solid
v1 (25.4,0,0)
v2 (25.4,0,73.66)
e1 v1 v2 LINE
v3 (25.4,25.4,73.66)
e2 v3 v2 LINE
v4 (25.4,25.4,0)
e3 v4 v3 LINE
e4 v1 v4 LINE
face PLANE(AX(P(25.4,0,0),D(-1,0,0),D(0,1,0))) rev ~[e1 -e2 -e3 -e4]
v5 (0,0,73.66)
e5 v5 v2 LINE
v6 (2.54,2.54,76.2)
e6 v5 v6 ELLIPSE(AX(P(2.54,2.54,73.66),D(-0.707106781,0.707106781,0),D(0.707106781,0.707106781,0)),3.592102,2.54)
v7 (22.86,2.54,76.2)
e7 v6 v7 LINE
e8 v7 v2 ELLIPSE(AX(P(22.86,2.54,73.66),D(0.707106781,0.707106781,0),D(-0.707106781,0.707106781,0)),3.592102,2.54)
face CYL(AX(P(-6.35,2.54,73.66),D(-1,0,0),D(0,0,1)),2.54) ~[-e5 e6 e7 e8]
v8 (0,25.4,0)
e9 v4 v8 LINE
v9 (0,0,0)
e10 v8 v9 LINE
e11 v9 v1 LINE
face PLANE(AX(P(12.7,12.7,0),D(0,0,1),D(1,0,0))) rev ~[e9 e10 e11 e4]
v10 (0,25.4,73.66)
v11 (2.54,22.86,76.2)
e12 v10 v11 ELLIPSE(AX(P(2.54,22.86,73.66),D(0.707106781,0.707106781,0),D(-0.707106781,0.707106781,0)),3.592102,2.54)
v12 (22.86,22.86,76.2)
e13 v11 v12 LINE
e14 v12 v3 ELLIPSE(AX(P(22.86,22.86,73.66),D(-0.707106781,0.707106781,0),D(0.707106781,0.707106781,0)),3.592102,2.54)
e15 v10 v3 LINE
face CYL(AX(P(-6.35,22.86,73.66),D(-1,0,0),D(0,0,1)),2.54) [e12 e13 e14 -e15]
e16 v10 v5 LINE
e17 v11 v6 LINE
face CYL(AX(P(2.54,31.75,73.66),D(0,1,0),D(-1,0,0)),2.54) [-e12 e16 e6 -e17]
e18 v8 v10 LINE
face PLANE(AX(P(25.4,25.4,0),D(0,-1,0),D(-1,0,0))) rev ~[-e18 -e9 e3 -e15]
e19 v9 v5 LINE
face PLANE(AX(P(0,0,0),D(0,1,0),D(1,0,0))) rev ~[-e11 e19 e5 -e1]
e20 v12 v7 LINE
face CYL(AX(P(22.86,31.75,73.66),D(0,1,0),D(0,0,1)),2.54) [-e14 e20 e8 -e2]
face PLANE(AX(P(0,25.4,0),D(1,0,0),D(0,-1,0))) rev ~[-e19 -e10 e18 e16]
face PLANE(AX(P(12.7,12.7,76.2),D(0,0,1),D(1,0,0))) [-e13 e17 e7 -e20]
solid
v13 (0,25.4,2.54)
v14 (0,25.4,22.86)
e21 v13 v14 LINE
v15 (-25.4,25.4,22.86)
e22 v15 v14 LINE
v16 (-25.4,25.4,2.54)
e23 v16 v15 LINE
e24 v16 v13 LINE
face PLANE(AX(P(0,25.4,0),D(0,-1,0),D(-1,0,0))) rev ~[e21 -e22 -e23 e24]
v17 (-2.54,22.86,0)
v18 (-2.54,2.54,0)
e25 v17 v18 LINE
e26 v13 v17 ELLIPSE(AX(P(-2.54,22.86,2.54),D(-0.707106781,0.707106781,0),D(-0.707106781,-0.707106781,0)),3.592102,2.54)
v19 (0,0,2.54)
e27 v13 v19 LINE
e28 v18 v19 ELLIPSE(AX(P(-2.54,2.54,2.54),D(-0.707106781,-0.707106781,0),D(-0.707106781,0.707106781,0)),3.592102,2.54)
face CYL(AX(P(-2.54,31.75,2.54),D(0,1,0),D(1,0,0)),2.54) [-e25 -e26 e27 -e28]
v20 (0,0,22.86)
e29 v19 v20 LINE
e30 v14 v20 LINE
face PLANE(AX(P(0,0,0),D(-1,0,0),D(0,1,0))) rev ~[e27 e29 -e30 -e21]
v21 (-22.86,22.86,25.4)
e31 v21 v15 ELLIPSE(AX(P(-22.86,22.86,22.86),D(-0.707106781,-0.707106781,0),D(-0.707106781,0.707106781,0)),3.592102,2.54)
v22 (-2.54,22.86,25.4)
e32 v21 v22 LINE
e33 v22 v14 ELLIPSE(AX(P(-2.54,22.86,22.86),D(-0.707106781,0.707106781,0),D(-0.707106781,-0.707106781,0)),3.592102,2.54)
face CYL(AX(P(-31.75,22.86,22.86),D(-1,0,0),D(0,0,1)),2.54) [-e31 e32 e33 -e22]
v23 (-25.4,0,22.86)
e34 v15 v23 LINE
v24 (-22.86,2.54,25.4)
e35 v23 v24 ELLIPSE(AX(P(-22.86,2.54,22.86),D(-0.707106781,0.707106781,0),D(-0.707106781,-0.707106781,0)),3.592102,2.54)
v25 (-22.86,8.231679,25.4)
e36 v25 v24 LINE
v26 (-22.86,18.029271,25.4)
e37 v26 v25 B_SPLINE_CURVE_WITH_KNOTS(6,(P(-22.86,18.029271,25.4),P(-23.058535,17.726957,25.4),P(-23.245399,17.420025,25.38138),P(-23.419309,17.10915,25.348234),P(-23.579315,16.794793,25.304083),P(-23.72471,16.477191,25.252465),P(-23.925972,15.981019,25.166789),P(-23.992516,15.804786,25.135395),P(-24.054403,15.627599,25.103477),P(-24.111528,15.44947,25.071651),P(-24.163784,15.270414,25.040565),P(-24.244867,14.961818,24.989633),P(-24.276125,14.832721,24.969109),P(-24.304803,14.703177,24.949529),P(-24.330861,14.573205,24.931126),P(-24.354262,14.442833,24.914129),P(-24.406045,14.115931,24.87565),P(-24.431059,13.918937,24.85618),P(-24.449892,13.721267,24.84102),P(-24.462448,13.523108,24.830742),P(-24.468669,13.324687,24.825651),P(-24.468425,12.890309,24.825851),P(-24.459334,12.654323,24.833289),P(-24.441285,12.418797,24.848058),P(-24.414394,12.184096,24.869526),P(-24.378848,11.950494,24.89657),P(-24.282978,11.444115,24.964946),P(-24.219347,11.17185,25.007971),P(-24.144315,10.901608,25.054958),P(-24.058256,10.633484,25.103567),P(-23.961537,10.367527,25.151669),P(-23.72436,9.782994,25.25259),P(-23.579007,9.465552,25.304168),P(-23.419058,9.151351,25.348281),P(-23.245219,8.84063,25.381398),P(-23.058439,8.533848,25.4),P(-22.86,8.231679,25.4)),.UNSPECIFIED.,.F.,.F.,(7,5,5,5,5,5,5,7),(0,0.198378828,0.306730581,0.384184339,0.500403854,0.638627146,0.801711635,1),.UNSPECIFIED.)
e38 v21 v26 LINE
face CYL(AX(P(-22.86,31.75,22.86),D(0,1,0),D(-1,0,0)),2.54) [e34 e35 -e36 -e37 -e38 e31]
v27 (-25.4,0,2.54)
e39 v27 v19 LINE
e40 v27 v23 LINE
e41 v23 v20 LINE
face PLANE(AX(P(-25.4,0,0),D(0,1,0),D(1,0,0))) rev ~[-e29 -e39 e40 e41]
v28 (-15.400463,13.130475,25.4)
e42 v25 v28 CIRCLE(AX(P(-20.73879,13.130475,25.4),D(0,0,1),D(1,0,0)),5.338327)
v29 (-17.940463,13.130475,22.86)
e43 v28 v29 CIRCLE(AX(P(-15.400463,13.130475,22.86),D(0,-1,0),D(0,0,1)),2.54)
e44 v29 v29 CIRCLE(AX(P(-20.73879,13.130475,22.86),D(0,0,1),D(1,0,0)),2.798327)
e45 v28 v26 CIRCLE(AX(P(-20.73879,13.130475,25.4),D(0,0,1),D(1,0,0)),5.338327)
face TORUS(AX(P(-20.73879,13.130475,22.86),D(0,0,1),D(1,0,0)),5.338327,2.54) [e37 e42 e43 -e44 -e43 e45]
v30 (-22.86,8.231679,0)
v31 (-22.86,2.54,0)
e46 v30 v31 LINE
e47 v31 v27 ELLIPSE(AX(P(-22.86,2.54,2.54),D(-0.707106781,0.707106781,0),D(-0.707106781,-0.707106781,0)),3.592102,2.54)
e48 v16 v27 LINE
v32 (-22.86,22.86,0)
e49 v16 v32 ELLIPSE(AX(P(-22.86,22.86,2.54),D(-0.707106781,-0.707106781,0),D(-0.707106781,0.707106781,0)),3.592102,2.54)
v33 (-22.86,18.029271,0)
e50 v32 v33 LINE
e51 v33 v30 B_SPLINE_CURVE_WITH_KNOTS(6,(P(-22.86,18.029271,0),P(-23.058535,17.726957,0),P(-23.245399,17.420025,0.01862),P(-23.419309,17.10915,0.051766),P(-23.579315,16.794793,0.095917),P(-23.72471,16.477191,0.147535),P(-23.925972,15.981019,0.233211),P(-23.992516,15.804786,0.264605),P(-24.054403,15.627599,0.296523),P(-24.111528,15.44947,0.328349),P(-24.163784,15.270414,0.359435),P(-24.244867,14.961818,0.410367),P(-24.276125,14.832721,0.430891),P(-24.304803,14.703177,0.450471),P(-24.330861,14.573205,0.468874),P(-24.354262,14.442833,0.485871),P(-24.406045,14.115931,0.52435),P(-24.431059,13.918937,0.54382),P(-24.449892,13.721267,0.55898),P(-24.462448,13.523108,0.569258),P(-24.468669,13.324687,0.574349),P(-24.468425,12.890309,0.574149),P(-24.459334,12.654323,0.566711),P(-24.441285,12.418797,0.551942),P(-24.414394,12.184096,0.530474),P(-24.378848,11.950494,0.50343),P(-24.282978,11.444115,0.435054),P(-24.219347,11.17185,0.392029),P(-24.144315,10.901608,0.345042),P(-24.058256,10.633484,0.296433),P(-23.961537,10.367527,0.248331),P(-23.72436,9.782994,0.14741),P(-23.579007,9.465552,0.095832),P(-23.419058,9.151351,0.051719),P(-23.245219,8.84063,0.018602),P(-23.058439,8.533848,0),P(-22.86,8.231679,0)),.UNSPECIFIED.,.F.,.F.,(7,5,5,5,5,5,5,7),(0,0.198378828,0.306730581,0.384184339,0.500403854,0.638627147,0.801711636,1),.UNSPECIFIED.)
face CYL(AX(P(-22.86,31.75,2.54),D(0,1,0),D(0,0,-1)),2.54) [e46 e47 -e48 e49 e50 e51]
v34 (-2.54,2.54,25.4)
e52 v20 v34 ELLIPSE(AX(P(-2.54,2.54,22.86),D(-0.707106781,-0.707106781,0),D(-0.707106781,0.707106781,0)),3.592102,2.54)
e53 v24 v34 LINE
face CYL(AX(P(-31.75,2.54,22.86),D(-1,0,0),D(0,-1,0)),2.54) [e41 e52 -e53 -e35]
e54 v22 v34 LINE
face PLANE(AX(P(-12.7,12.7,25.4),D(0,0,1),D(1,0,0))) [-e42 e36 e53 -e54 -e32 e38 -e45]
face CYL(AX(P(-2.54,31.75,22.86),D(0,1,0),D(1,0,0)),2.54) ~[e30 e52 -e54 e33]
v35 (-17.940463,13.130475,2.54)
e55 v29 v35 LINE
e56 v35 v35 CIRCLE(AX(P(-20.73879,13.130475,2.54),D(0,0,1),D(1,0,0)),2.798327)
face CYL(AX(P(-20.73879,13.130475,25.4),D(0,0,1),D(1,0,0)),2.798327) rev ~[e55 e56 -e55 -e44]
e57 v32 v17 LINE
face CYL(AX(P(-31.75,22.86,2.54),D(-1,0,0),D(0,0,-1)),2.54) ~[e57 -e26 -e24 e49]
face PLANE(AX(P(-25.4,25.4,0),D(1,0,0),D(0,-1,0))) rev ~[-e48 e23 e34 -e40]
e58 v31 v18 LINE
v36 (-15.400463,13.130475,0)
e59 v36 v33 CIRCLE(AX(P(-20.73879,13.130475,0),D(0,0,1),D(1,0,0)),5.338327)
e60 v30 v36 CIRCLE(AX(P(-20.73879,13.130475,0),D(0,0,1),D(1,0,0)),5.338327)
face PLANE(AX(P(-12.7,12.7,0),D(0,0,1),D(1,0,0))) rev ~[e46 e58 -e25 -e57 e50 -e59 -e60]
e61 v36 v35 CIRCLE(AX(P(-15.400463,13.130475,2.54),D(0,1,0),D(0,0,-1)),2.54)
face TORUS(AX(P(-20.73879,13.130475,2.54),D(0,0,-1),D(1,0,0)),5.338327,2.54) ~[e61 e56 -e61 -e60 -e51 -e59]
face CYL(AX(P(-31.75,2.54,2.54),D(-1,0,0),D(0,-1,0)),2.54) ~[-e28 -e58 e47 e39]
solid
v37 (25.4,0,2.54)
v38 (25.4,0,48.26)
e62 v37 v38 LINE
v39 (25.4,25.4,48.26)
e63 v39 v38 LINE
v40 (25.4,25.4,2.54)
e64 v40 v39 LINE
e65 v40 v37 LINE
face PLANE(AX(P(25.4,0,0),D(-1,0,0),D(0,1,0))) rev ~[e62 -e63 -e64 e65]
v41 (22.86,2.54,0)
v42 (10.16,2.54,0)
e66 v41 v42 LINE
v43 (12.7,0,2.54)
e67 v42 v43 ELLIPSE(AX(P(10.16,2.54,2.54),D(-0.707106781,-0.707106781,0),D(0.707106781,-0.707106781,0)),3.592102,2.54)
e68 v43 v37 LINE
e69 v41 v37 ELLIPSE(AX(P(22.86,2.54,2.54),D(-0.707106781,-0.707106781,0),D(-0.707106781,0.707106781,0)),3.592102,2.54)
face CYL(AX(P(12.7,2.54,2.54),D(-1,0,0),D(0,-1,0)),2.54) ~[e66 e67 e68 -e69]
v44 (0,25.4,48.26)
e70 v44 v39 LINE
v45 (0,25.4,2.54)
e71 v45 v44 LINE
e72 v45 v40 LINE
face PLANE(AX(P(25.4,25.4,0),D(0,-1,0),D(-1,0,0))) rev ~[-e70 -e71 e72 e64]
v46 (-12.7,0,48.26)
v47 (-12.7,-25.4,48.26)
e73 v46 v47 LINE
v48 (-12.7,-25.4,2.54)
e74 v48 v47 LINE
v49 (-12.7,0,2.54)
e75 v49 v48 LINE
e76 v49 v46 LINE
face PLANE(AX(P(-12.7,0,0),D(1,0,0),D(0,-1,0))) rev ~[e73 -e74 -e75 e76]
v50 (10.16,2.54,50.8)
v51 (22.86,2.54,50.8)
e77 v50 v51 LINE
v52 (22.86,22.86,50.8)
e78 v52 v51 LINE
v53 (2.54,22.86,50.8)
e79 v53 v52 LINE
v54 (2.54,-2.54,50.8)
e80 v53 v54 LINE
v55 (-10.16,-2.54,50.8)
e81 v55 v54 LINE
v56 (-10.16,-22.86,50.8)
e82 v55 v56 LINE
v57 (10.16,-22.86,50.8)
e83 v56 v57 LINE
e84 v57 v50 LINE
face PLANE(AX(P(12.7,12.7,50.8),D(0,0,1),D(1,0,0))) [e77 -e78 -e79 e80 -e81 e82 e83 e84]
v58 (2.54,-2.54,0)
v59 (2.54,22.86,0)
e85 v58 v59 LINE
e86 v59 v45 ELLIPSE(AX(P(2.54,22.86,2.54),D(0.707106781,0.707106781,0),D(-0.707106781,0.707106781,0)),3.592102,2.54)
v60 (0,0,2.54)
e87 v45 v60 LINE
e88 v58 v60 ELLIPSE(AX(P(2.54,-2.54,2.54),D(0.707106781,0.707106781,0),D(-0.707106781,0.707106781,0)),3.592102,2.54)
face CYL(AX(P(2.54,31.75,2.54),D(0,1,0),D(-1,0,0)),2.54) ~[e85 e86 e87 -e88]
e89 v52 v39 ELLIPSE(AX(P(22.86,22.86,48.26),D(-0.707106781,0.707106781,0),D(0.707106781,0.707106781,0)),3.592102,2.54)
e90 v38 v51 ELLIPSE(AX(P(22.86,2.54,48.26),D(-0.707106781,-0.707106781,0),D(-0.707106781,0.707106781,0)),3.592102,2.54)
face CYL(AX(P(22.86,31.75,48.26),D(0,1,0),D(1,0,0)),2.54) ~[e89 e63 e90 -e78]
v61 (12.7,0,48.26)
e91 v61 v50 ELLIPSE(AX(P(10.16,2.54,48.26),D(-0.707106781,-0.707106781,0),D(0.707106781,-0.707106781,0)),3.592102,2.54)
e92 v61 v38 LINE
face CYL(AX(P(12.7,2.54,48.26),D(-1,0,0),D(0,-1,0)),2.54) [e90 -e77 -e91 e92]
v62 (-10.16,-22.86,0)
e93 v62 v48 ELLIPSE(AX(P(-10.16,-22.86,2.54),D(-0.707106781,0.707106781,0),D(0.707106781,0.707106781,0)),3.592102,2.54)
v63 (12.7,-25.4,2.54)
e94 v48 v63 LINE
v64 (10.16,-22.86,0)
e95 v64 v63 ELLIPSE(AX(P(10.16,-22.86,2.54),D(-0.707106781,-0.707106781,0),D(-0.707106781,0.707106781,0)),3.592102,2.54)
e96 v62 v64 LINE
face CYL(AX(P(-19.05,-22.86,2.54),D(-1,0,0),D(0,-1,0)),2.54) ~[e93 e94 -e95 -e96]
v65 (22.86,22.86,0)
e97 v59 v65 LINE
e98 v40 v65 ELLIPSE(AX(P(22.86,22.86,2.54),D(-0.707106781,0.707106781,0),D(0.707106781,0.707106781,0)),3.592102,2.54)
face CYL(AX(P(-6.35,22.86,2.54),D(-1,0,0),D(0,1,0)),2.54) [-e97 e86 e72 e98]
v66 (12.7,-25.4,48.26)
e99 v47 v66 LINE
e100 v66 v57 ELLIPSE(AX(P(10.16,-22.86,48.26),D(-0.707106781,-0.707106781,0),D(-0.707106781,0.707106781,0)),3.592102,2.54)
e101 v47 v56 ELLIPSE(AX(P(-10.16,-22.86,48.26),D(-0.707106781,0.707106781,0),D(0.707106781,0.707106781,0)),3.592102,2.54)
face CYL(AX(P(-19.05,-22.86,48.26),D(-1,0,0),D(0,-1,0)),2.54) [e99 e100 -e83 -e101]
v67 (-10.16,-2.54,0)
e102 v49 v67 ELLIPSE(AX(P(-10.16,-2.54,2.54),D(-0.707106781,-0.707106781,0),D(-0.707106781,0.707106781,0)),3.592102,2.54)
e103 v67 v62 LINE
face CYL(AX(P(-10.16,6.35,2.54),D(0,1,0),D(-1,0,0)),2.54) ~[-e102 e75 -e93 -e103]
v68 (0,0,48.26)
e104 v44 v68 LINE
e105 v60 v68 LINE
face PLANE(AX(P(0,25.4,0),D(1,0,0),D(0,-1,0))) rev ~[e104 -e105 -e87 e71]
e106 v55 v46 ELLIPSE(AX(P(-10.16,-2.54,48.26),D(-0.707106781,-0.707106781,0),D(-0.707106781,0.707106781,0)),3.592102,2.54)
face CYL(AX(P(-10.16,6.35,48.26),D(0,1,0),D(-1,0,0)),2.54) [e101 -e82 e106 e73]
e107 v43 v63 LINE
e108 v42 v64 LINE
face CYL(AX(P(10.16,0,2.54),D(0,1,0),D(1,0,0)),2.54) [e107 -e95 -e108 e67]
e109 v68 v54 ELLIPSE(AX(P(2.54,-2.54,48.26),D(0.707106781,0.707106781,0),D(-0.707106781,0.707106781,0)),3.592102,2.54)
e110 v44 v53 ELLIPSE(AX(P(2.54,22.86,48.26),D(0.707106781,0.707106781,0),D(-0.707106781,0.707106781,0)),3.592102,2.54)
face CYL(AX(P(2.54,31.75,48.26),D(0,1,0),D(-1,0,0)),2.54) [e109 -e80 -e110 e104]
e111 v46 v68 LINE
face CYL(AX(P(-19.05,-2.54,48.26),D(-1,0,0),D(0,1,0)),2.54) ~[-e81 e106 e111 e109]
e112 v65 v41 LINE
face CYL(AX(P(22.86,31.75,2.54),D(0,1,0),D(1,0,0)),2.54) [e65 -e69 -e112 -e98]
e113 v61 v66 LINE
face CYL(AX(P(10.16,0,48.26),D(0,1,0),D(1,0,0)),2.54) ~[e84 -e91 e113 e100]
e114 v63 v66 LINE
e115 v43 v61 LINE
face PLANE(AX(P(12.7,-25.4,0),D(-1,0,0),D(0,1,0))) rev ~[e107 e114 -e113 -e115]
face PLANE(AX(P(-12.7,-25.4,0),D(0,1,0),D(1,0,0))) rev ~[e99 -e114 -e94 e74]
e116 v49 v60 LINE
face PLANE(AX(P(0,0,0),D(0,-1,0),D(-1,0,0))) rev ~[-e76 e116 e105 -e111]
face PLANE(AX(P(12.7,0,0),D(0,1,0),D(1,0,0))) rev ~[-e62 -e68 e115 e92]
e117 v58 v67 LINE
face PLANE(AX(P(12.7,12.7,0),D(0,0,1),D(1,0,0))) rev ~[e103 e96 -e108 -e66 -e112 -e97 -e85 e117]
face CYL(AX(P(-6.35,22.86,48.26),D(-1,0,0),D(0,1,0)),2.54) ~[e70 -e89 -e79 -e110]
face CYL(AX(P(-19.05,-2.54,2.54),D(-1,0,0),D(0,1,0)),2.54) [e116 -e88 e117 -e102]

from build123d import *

# Parameters (mm, degrees)
F1_DEPTH       = 25.4
F3_DEPTH       = 76.2
F4_DEPTH       = 50.8
F5_R           = 2.7983271334
F6_DEPTH       = 40.64
F7_T1_DEPTH    = 38.1
F7_T3_DEPTH    = 38.1
F7_2_T1_DEPTH  = 31.75
F7_2_T3_DEPTH  = 19.05
F7_2_T5_DEPTH  = 38.1
F7_2_T7_DEPTH  = 38.1
F7_2_T9_DEPTH  = 31.75
F7_2_T11_DEPTH = 19.05
F7_2_T13_DEPTH = 38.1
F7_2_T15_DEPTH = 38.1
F7_2_T21_DEPTH = 38.1
F7_2_T25_DEPTH = 25.4
F7_2_T32_DEPTH = 38.1
F7_2_T36_DEPTH = 25.4
F7_2_T43_DEPTH = 38.1
F7_2_T47_DEPTH = 25.4
F7_2_T54_DEPTH = 38.1
F7_2_T58_DEPTH = 25.4
F7_3_T1_DEPTH  = 38.1
F7_3_T3_DEPTH  = 38.1


# Not quite as in the source:
# - a fillet or chamfer that OpenCascade refuses, or shapes differently, is made with other operations: its cross-section is extruded or revolved along the edge and cut away or added


with BuildPart() as f1:
    # F0 (on Top) → F1 (new body)
    with BuildSketch(Plane.XY):
        Polygon((-12.7, 0), (0, 0), (0, 25.4), (-25.4, 25.4), (-25.4, 0), align=None)
    extrude(amount=F1_DEPTH)

    # F5 (on face) → F6 (cut)
    with BuildSketch(Plane.XY.offset(25.4)):
        with Locations((-20.7387898117, 13.1304748356)):
            Circle(F5_R)
    extrude(amount=-F6_DEPTH, mode=Mode.SUBTRACT)

    # F7: fillet of radius 2.54 on 10 edges, made by hand

    # F7_s2 → F7_t1 (cut)
    with BuildSketch(Plane.YZ.offset(-31.75)):
        with BuildLine():
            ThreePointArc((0, 22.86), (0.7439487758, 24.6560512242), (2.54, 25.4))
            Line((2.54, 25.4), (0, 25.4))
            Line((0, 25.4), (0, 22.86))
        make_face()
        with BuildLine():
            ThreePointArc((22.86, 25.4), (24.6560512242, 24.6560512242), (25.4, 22.86))
            Line((25.4, 22.86), (25.4, 25.4))
            Line((25.4, 25.4), (22.86, 25.4))
        make_face()
        with BuildLine():
            ThreePointArc((0, 2.54), (0.7439487758, 0.7439487758), (2.54, 0))
            Line((2.54, 0), (0, 0))
            Line((0, 0), (0, 2.54))
        make_face()
        with BuildLine():
            ThreePointArc((22.86, 0), (24.6560512242, 0.7439487758), (25.4, 2.54))
            Line((25.4, 2.54), (25.4, 0))
            Line((25.4, 0), (22.86, 0))
        make_face()
    extrude(amount=F7_T1_DEPTH, mode=Mode.SUBTRACT)

    # F7_s4 → F7_t3 (cut)
    with BuildSketch(Plane.XZ.offset(-31.75)):
        with BuildLine():
            ThreePointArc((0, 22.86), (-0.7439487758, 24.6560512242), (-2.54, 25.4))
            Line((-2.54, 25.4), (0, 25.4))
            Line((0, 25.4), (0, 22.86))
        make_face()
        with BuildLine():
            ThreePointArc((-25.4, 22.86), (-24.6560512242, 24.6560512242), (-22.86, 25.4))
            Line((-22.86, 25.4), (-25.4, 25.4))
            Line((-25.4, 25.4), (-25.4, 22.86))
        make_face()
        with BuildLine():
            ThreePointArc((0, 2.54), (-0.7439487758, 0.7439487758), (-2.54, 0))
            Line((-2.54, 0), (0, 0))
            Line((0, 0), (0, 2.54))
        make_face()
        with BuildLine():
            ThreePointArc((-22.86, 0), (-24.6560512242, 0.7439487758), (-25.4, 2.54))
            Line((-25.4, 2.54), (-25.4, 0))
            Line((-25.4, 0), (-22.86, 0))
        make_face()
    extrude(amount=F7_T3_DEPTH, mode=Mode.SUBTRACT)

    # F7_s5 → F7_t6 (revolve, cut)
    with BuildSketch(Plane.XZ.offset(-13.1304748356)):
        with BuildLine():
            ThreePointArc((-15.4004626784, 25.4), (-17.1965139026, 24.6560512242), (-17.9404626784, 22.86))
            Line((-17.9404626784, 22.86), (-17.9404626784, 25.4))
            Line((-17.9404626784, 25.4), (-15.4004626784, 25.4))
        make_face()
    revolve(axis=Axis((-20.7387898117, 13.1304748356, 25.4), (0, 0, 1)), mode=Mode.SUBTRACT)

    # F7_s7 → F7_t8 (revolve, cut)
    with BuildSketch(Plane.XZ.offset(-13.1304748356)):
        with BuildLine():
            ThreePointArc((-15.4004626784, 0), (-17.1965139026, 0.7439487758), (-17.9404626784, 2.54))
            Line((-17.9404626784, 2.54), (-17.9404626784, 0))
            Line((-17.9404626784, 0), (-15.4004626784, 0))
        make_face()
    revolve(axis=Axis((-20.7387898117, 13.1304748356, 0), (0, 0, 1)), mode=Mode.SUBTRACT)


with BuildPart() as f3:
    # F2 (on Top) → F3 (new body)
    with BuildSketch(Plane.XY):
        Polygon((0, 25.4), (0, 0), (12.7, 0), (25.4, 0), (25.4, 25.4), align=None)
    extrude(amount=F3_DEPTH)

    # F7#3: fillet of radius 2.54 on 4 edges, made by hand

    # F7_3_s2 → F7_3_t1 (cut)
    with BuildSketch(Plane.XZ.offset(-31.75)):
        with BuildLine():
            ThreePointArc((0, 73.66), (0.7439487758, 75.4560512242), (2.54, 76.2))
            Line((2.54, 76.2), (0, 76.2))
            Line((0, 76.2), (0, 73.66))
        make_face()
        with BuildLine():
            ThreePointArc((22.86, 76.2), (24.6560512242, 75.4560512242), (25.4, 73.66))
            Line((25.4, 73.66), (25.4, 76.2))
            Line((25.4, 76.2), (22.86, 76.2))
        make_face()
    extrude(amount=F7_3_T1_DEPTH, mode=Mode.SUBTRACT)

    # F7_3_s4 → F7_3_t3 (cut)
    with BuildSketch(Plane.YZ.offset(-6.35)):
        with BuildLine():
            ThreePointArc((2.54, 76.2), (0.7439487758, 75.4560512242), (0, 73.66))
            Line((0, 73.66), (0, 76.2))
            Line((0, 76.2), (2.54, 76.2))
        make_face()
        with BuildLine():
            ThreePointArc((22.86, 76.2), (24.6560512242, 75.4560512242), (25.4, 73.66))
            Line((25.4, 73.66), (25.4, 76.2))
            Line((25.4, 76.2), (22.86, 76.2))
        make_face()
    extrude(amount=F7_3_T3_DEPTH, mode=Mode.SUBTRACT)


with BuildPart() as f4:
    # F2 (on Top) → F4 (new body)
    with BuildSketch(Plane.XY):
        Polygon((0, 25.4), (0, 0), (12.7, 0), (25.4, 0), (25.4, 25.4), align=None)
        Polygon((12.7, 0), (0, 0), (-12.7, 0), (-12.7, -25.4), (12.7, -25.4), align=None)
    extrude(amount=F4_DEPTH)

    # F7#2: fillet of radius 2.54 on 16 edges, made by hand

    # F7_2_s2 → F7_2_t1 (cut)
    with BuildSketch(Plane.XZ.offset(-31.75)):
        with BuildLine():
            ThreePointArc((0, 2.54), (0.7439487758, 0.7439487758), (2.54, 0))
            Line((2.54, 0), (0, 0))
            Line((0, 0), (0, 2.54))
        make_face()
        with BuildLine():
            ThreePointArc((0, 48.26), (0.7439487758, 50.0560512242), (2.54, 50.8))
            Line((2.54, 50.8), (0, 50.8))
            Line((0, 50.8), (0, 48.26))
        make_face()
    extrude(amount=F7_2_T1_DEPTH, mode=Mode.SUBTRACT)

    # F7_2_s4 → F7_2_t3 (cut)
    with BuildSketch(Plane.YZ.offset(-19.05)):
        with BuildLine():
            ThreePointArc((0, 48.26), (-0.7439487758, 50.0560512242), (-2.54, 50.8))
            Line((-2.54, 50.8), (0, 50.8))
            Line((0, 50.8), (0, 48.26))
        make_face()
        with BuildLine():
            ThreePointArc((0, 2.54), (-0.7439487758, 0.7439487758), (-2.54, 0))
            Line((-2.54, 0), (0, 0))
            Line((0, 0), (0, 2.54))
        make_face()
    extrude(amount=F7_2_T3_DEPTH, mode=Mode.SUBTRACT)

    # F7_2_s6 → F7_2_t5 (cut)
    with BuildSketch(Plane.XZ.offset(-6.35)):
        with BuildLine():
            ThreePointArc((-12.7, 48.26), (-11.9560512242, 50.0560512242), (-10.16, 50.8))
            Line((-10.16, 50.8), (-12.7, 50.8))
            Line((-12.7, 50.8), (-12.7, 48.26))
        make_face()
        with BuildLine():
            ThreePointArc((-12.7, 2.54), (-11.9560512242, 0.7439487758), (-10.16, 0))
            Line((-10.16, 0), (-12.7, 0))
            Line((-12.7, 0), (-12.7, 2.54))
        make_face()
    extrude(amount=F7_2_T5_DEPTH, mode=Mode.SUBTRACT)

    # F7_2_s8 → F7_2_t7 (cut)
    with BuildSketch(Plane.YZ.offset(-19.05)):
        with BuildLine():
            ThreePointArc((-25.4, 48.26), (-24.6560512242, 50.0560512242), (-22.86, 50.8))
            Line((-22.86, 50.8), (-25.4, 50.8))
            Line((-25.4, 50.8), (-25.4, 48.26))
        make_face()
        with BuildLine():
            ThreePointArc((-25.4, 2.54), (-24.6560512242, 0.7439487758), (-22.86, 0))
            Line((-22.86, 0), (-25.4, 0))
            Line((-25.4, 0), (-25.4, 2.54))
        make_face()
    extrude(amount=F7_2_T7_DEPTH, mode=Mode.SUBTRACT)

    # F7_2_s10 → F7_2_t9 (cut)
    with BuildSketch(Plane.XZ):
        with BuildLine():
            ThreePointArc((12.7, 48.26), (11.9560512242, 50.0560512242), (10.16, 50.8))
            Line((10.16, 50.8), (12.7, 50.8))
            Line((12.7, 50.8), (12.7, 48.26))
        make_face()
        with BuildLine():
            ThreePointArc((12.7, 2.54), (11.9560512242, 0.7439487758), (10.16, 0))
            Line((10.16, 0), (12.7, 0))
            Line((12.7, 0), (12.7, 2.54))
        make_face()
    extrude(amount=F7_2_T9_DEPTH, mode=Mode.SUBTRACT)

    # F7_2_s12 → F7_2_t11 (cut)
    with BuildSketch(Plane.YZ.offset(12.7)):
        with BuildLine():
            ThreePointArc((0, 48.26), (0.7439487758, 50.0560512242), (2.54, 50.8))
            Line((2.54, 50.8), (0, 50.8))
            Line((0, 50.8), (0, 48.26))
        make_face()
        with BuildLine():
            ThreePointArc((0, 2.54), (0.7439487758, 0.7439487758), (2.54, 0))
            Line((2.54, 0), (0, 0))
            Line((0, 0), (0, 2.54))
        make_face()
    extrude(amount=F7_2_T11_DEPTH, mode=Mode.SUBTRACT)

    # F7_2_s14 → F7_2_t13 (cut)
    with BuildSketch(Plane.XZ.offset(-31.75)):
        with BuildLine():
            ThreePointArc((25.4, 48.26), (24.6560512242, 50.0560512242), (22.86, 50.8))
            Line((22.86, 50.8), (25.4, 50.8))
            Line((25.4, 50.8), (25.4, 48.26))
        make_face()
        with BuildLine():
            ThreePointArc((25.4, 2.54), (24.6560512242, 0.7439487758), (22.86, 0))
            Line((22.86, 0), (25.4, 0))
            Line((25.4, 0), (25.4, 2.54))
        make_face()
    extrude(amount=F7_2_T13_DEPTH, mode=Mode.SUBTRACT)

    # F7_2_s16 → F7_2_t15 (cut)
    with BuildSketch(Plane.YZ.offset(-6.35)):
        with BuildLine():
            ThreePointArc((25.4, 48.26), (24.6560512242, 50.0560512242), (22.86, 50.8))
            Line((22.86, 50.8), (25.4, 50.8))
            Line((25.4, 50.8), (25.4, 48.26))
        make_face()
        with BuildLine():
            ThreePointArc((25.4, 2.54), (24.6560512242, 0.7439487758), (22.86, 0))
            Line((22.86, 0), (25.4, 0))
            Line((25.4, 0), (25.4, 2.54))
        make_face()
    extrude(amount=F7_2_T15_DEPTH, mode=Mode.SUBTRACT)


with BuildPart() as f7_2_tool19:
    # F7_2_s20 → F7_2_t21 (new body)
    with BuildSketch(Plane.XZ.offset(-31.75)):
        with BuildLine():
            ThreePointArc((0, 2.54), (0.7439487758, 0.7439487758), (2.54, 0))
            Line((2.54, 0), (0, 0))
            Line((0, 0), (0, 2.54))
        make_face()
    extrude(amount=F7_2_T21_DEPTH)

    split(bisect_by=Plane.XZ, keep=Keep.TOP)


with BuildPart() as f7_2_tool23:
    # F7_2_s24 → F7_2_t25 (new body)
    with BuildSketch(Plane.YZ.offset(6.35)):
        with BuildLine():
            ThreePointArc((0, 2.54), (-0.7439487758, 0.7439487758), (-2.54, 0))
            Line((-2.54, 0), (0, 0))
            Line((0, 0), (0, 2.54))
        make_face()
    extrude(amount=-F7_2_T25_DEPTH)

    split(bisect_by=Plane.YZ, keep=Keep.TOP)


with BuildPart() as f7_2_tool19_1:
    add(f7_2_tool19.part)

    # F7_2_t27: intersect F7_2_tool23
    add(f7_2_tool23.part, mode=Mode.INTERSECT)


with BuildPart() as f4_1:
    add(f4.part)

    # F7_2_t17: cut F7_2_tool19
    add(f7_2_tool19_1.part, mode=Mode.SUBTRACT)


with BuildPart() as f7_2_tool30:
    # F7_2_s31 → F7_2_t32 (new body)
    with BuildSketch(Plane.XZ.offset(-31.75)):
        with BuildLine():
            ThreePointArc((0, 48.26), (0.7439487758, 50.0560512242), (2.54, 50.8))
            Line((2.54, 50.8), (0, 50.8))
            Line((0, 50.8), (0, 48.26))
        make_face()
    extrude(amount=F7_2_T32_DEPTH)

    split(bisect_by=Plane.XZ, keep=Keep.TOP)


with BuildPart() as f7_2_tool34:
    # F7_2_s35 → F7_2_t36 (new body)
    with BuildSketch(Plane.YZ.offset(6.35)):
        with BuildLine():
            ThreePointArc((0, 48.26), (-0.7439487758, 50.0560512242), (-2.54, 50.8))
            Line((-2.54, 50.8), (0, 50.8))
            Line((0, 50.8), (0, 48.26))
        make_face()
    extrude(amount=-F7_2_T36_DEPTH)

    split(bisect_by=Plane.YZ, keep=Keep.TOP)


with BuildPart() as f7_2_tool30_1:
    add(f7_2_tool30.part)

    # F7_2_t38: intersect F7_2_tool34
    add(f7_2_tool34.part, mode=Mode.INTERSECT)


with BuildPart() as f4_2:
    add(f4_1.part)

    # F7_2_t28: cut F7_2_tool30
    add(f7_2_tool30_1.part, mode=Mode.SUBTRACT)


with BuildPart() as f7_2_tool41:
    # F7_2_s42 → F7_2_t43 (new body)
    with BuildSketch(Plane.XZ.offset(31.75)):
        with BuildLine():
            ThreePointArc((12.7, 48.26), (11.9560512242, 50.0560512242), (10.16, 50.8))
            Line((10.16, 50.8), (12.7, 50.8))
            Line((12.7, 50.8), (12.7, 48.26))
        make_face()
    extrude(amount=-F7_2_T43_DEPTH)

    split(bisect_by=Plane.XZ, keep=Keep.BOTTOM)


with BuildPart() as f7_2_tool45:
    # F7_2_s46 → F7_2_t47 (new body)
    with BuildSketch(Plane.YZ.offset(6.35)):
        with BuildLine():
            ThreePointArc((0, 48.26), (0.7439487758, 50.0560512242), (2.54, 50.8))
            Line((2.54, 50.8), (0, 50.8))
            Line((0, 50.8), (0, 48.26))
        make_face()
    extrude(amount=F7_2_T47_DEPTH)

    split(bisect_by=Plane.YZ.offset(12.7), keep=Keep.BOTTOM)


with BuildPart() as f7_2_tool41_1:
    add(f7_2_tool41.part)

    # F7_2_t49: intersect F7_2_tool45
    add(f7_2_tool45.part, mode=Mode.INTERSECT)


with BuildPart() as f4_3:
    add(f4_2.part)

    # F7_2_t39: cut F7_2_tool41
    add(f7_2_tool41_1.part, mode=Mode.SUBTRACT)


with BuildPart() as f7_2_tool52:
    # F7_2_s53 → F7_2_t54 (new body)
    with BuildSketch(Plane.XZ.offset(31.75)):
        with BuildLine():
            ThreePointArc((12.7, 2.54), (11.9560512242, 0.7439487758), (10.16, 0))
            Line((10.16, 0), (12.7, 0))
            Line((12.7, 0), (12.7, 2.54))
        make_face()
    extrude(amount=-F7_2_T54_DEPTH)

    split(bisect_by=Plane.XZ, keep=Keep.BOTTOM)


with BuildPart() as f7_2_tool56:
    # F7_2_s57 → F7_2_t58 (new body)
    with BuildSketch(Plane.YZ.offset(6.35)):
        with BuildLine():
            ThreePointArc((0, 2.54), (0.7439487758, 0.7439487758), (2.54, 0))
            Line((2.54, 0), (0, 0))
            Line((0, 0), (0, 2.54))
        make_face()
    extrude(amount=F7_2_T58_DEPTH)

    split(bisect_by=Plane.YZ.offset(12.7), keep=Keep.BOTTOM)


with BuildPart() as f7_2_tool52_1:
    add(f7_2_tool52.part)

    # F7_2_t60: intersect F7_2_tool56
    add(f7_2_tool56.part, mode=Mode.INTERSECT)


with BuildPart() as f4_4:
    add(f4_3.part)

    # F7_2_t50: cut F7_2_tool52
    add(f7_2_tool52_1.part, mode=Mode.SUBTRACT)


solid = Compound([f1.part, f3.part, f4_4.part])
